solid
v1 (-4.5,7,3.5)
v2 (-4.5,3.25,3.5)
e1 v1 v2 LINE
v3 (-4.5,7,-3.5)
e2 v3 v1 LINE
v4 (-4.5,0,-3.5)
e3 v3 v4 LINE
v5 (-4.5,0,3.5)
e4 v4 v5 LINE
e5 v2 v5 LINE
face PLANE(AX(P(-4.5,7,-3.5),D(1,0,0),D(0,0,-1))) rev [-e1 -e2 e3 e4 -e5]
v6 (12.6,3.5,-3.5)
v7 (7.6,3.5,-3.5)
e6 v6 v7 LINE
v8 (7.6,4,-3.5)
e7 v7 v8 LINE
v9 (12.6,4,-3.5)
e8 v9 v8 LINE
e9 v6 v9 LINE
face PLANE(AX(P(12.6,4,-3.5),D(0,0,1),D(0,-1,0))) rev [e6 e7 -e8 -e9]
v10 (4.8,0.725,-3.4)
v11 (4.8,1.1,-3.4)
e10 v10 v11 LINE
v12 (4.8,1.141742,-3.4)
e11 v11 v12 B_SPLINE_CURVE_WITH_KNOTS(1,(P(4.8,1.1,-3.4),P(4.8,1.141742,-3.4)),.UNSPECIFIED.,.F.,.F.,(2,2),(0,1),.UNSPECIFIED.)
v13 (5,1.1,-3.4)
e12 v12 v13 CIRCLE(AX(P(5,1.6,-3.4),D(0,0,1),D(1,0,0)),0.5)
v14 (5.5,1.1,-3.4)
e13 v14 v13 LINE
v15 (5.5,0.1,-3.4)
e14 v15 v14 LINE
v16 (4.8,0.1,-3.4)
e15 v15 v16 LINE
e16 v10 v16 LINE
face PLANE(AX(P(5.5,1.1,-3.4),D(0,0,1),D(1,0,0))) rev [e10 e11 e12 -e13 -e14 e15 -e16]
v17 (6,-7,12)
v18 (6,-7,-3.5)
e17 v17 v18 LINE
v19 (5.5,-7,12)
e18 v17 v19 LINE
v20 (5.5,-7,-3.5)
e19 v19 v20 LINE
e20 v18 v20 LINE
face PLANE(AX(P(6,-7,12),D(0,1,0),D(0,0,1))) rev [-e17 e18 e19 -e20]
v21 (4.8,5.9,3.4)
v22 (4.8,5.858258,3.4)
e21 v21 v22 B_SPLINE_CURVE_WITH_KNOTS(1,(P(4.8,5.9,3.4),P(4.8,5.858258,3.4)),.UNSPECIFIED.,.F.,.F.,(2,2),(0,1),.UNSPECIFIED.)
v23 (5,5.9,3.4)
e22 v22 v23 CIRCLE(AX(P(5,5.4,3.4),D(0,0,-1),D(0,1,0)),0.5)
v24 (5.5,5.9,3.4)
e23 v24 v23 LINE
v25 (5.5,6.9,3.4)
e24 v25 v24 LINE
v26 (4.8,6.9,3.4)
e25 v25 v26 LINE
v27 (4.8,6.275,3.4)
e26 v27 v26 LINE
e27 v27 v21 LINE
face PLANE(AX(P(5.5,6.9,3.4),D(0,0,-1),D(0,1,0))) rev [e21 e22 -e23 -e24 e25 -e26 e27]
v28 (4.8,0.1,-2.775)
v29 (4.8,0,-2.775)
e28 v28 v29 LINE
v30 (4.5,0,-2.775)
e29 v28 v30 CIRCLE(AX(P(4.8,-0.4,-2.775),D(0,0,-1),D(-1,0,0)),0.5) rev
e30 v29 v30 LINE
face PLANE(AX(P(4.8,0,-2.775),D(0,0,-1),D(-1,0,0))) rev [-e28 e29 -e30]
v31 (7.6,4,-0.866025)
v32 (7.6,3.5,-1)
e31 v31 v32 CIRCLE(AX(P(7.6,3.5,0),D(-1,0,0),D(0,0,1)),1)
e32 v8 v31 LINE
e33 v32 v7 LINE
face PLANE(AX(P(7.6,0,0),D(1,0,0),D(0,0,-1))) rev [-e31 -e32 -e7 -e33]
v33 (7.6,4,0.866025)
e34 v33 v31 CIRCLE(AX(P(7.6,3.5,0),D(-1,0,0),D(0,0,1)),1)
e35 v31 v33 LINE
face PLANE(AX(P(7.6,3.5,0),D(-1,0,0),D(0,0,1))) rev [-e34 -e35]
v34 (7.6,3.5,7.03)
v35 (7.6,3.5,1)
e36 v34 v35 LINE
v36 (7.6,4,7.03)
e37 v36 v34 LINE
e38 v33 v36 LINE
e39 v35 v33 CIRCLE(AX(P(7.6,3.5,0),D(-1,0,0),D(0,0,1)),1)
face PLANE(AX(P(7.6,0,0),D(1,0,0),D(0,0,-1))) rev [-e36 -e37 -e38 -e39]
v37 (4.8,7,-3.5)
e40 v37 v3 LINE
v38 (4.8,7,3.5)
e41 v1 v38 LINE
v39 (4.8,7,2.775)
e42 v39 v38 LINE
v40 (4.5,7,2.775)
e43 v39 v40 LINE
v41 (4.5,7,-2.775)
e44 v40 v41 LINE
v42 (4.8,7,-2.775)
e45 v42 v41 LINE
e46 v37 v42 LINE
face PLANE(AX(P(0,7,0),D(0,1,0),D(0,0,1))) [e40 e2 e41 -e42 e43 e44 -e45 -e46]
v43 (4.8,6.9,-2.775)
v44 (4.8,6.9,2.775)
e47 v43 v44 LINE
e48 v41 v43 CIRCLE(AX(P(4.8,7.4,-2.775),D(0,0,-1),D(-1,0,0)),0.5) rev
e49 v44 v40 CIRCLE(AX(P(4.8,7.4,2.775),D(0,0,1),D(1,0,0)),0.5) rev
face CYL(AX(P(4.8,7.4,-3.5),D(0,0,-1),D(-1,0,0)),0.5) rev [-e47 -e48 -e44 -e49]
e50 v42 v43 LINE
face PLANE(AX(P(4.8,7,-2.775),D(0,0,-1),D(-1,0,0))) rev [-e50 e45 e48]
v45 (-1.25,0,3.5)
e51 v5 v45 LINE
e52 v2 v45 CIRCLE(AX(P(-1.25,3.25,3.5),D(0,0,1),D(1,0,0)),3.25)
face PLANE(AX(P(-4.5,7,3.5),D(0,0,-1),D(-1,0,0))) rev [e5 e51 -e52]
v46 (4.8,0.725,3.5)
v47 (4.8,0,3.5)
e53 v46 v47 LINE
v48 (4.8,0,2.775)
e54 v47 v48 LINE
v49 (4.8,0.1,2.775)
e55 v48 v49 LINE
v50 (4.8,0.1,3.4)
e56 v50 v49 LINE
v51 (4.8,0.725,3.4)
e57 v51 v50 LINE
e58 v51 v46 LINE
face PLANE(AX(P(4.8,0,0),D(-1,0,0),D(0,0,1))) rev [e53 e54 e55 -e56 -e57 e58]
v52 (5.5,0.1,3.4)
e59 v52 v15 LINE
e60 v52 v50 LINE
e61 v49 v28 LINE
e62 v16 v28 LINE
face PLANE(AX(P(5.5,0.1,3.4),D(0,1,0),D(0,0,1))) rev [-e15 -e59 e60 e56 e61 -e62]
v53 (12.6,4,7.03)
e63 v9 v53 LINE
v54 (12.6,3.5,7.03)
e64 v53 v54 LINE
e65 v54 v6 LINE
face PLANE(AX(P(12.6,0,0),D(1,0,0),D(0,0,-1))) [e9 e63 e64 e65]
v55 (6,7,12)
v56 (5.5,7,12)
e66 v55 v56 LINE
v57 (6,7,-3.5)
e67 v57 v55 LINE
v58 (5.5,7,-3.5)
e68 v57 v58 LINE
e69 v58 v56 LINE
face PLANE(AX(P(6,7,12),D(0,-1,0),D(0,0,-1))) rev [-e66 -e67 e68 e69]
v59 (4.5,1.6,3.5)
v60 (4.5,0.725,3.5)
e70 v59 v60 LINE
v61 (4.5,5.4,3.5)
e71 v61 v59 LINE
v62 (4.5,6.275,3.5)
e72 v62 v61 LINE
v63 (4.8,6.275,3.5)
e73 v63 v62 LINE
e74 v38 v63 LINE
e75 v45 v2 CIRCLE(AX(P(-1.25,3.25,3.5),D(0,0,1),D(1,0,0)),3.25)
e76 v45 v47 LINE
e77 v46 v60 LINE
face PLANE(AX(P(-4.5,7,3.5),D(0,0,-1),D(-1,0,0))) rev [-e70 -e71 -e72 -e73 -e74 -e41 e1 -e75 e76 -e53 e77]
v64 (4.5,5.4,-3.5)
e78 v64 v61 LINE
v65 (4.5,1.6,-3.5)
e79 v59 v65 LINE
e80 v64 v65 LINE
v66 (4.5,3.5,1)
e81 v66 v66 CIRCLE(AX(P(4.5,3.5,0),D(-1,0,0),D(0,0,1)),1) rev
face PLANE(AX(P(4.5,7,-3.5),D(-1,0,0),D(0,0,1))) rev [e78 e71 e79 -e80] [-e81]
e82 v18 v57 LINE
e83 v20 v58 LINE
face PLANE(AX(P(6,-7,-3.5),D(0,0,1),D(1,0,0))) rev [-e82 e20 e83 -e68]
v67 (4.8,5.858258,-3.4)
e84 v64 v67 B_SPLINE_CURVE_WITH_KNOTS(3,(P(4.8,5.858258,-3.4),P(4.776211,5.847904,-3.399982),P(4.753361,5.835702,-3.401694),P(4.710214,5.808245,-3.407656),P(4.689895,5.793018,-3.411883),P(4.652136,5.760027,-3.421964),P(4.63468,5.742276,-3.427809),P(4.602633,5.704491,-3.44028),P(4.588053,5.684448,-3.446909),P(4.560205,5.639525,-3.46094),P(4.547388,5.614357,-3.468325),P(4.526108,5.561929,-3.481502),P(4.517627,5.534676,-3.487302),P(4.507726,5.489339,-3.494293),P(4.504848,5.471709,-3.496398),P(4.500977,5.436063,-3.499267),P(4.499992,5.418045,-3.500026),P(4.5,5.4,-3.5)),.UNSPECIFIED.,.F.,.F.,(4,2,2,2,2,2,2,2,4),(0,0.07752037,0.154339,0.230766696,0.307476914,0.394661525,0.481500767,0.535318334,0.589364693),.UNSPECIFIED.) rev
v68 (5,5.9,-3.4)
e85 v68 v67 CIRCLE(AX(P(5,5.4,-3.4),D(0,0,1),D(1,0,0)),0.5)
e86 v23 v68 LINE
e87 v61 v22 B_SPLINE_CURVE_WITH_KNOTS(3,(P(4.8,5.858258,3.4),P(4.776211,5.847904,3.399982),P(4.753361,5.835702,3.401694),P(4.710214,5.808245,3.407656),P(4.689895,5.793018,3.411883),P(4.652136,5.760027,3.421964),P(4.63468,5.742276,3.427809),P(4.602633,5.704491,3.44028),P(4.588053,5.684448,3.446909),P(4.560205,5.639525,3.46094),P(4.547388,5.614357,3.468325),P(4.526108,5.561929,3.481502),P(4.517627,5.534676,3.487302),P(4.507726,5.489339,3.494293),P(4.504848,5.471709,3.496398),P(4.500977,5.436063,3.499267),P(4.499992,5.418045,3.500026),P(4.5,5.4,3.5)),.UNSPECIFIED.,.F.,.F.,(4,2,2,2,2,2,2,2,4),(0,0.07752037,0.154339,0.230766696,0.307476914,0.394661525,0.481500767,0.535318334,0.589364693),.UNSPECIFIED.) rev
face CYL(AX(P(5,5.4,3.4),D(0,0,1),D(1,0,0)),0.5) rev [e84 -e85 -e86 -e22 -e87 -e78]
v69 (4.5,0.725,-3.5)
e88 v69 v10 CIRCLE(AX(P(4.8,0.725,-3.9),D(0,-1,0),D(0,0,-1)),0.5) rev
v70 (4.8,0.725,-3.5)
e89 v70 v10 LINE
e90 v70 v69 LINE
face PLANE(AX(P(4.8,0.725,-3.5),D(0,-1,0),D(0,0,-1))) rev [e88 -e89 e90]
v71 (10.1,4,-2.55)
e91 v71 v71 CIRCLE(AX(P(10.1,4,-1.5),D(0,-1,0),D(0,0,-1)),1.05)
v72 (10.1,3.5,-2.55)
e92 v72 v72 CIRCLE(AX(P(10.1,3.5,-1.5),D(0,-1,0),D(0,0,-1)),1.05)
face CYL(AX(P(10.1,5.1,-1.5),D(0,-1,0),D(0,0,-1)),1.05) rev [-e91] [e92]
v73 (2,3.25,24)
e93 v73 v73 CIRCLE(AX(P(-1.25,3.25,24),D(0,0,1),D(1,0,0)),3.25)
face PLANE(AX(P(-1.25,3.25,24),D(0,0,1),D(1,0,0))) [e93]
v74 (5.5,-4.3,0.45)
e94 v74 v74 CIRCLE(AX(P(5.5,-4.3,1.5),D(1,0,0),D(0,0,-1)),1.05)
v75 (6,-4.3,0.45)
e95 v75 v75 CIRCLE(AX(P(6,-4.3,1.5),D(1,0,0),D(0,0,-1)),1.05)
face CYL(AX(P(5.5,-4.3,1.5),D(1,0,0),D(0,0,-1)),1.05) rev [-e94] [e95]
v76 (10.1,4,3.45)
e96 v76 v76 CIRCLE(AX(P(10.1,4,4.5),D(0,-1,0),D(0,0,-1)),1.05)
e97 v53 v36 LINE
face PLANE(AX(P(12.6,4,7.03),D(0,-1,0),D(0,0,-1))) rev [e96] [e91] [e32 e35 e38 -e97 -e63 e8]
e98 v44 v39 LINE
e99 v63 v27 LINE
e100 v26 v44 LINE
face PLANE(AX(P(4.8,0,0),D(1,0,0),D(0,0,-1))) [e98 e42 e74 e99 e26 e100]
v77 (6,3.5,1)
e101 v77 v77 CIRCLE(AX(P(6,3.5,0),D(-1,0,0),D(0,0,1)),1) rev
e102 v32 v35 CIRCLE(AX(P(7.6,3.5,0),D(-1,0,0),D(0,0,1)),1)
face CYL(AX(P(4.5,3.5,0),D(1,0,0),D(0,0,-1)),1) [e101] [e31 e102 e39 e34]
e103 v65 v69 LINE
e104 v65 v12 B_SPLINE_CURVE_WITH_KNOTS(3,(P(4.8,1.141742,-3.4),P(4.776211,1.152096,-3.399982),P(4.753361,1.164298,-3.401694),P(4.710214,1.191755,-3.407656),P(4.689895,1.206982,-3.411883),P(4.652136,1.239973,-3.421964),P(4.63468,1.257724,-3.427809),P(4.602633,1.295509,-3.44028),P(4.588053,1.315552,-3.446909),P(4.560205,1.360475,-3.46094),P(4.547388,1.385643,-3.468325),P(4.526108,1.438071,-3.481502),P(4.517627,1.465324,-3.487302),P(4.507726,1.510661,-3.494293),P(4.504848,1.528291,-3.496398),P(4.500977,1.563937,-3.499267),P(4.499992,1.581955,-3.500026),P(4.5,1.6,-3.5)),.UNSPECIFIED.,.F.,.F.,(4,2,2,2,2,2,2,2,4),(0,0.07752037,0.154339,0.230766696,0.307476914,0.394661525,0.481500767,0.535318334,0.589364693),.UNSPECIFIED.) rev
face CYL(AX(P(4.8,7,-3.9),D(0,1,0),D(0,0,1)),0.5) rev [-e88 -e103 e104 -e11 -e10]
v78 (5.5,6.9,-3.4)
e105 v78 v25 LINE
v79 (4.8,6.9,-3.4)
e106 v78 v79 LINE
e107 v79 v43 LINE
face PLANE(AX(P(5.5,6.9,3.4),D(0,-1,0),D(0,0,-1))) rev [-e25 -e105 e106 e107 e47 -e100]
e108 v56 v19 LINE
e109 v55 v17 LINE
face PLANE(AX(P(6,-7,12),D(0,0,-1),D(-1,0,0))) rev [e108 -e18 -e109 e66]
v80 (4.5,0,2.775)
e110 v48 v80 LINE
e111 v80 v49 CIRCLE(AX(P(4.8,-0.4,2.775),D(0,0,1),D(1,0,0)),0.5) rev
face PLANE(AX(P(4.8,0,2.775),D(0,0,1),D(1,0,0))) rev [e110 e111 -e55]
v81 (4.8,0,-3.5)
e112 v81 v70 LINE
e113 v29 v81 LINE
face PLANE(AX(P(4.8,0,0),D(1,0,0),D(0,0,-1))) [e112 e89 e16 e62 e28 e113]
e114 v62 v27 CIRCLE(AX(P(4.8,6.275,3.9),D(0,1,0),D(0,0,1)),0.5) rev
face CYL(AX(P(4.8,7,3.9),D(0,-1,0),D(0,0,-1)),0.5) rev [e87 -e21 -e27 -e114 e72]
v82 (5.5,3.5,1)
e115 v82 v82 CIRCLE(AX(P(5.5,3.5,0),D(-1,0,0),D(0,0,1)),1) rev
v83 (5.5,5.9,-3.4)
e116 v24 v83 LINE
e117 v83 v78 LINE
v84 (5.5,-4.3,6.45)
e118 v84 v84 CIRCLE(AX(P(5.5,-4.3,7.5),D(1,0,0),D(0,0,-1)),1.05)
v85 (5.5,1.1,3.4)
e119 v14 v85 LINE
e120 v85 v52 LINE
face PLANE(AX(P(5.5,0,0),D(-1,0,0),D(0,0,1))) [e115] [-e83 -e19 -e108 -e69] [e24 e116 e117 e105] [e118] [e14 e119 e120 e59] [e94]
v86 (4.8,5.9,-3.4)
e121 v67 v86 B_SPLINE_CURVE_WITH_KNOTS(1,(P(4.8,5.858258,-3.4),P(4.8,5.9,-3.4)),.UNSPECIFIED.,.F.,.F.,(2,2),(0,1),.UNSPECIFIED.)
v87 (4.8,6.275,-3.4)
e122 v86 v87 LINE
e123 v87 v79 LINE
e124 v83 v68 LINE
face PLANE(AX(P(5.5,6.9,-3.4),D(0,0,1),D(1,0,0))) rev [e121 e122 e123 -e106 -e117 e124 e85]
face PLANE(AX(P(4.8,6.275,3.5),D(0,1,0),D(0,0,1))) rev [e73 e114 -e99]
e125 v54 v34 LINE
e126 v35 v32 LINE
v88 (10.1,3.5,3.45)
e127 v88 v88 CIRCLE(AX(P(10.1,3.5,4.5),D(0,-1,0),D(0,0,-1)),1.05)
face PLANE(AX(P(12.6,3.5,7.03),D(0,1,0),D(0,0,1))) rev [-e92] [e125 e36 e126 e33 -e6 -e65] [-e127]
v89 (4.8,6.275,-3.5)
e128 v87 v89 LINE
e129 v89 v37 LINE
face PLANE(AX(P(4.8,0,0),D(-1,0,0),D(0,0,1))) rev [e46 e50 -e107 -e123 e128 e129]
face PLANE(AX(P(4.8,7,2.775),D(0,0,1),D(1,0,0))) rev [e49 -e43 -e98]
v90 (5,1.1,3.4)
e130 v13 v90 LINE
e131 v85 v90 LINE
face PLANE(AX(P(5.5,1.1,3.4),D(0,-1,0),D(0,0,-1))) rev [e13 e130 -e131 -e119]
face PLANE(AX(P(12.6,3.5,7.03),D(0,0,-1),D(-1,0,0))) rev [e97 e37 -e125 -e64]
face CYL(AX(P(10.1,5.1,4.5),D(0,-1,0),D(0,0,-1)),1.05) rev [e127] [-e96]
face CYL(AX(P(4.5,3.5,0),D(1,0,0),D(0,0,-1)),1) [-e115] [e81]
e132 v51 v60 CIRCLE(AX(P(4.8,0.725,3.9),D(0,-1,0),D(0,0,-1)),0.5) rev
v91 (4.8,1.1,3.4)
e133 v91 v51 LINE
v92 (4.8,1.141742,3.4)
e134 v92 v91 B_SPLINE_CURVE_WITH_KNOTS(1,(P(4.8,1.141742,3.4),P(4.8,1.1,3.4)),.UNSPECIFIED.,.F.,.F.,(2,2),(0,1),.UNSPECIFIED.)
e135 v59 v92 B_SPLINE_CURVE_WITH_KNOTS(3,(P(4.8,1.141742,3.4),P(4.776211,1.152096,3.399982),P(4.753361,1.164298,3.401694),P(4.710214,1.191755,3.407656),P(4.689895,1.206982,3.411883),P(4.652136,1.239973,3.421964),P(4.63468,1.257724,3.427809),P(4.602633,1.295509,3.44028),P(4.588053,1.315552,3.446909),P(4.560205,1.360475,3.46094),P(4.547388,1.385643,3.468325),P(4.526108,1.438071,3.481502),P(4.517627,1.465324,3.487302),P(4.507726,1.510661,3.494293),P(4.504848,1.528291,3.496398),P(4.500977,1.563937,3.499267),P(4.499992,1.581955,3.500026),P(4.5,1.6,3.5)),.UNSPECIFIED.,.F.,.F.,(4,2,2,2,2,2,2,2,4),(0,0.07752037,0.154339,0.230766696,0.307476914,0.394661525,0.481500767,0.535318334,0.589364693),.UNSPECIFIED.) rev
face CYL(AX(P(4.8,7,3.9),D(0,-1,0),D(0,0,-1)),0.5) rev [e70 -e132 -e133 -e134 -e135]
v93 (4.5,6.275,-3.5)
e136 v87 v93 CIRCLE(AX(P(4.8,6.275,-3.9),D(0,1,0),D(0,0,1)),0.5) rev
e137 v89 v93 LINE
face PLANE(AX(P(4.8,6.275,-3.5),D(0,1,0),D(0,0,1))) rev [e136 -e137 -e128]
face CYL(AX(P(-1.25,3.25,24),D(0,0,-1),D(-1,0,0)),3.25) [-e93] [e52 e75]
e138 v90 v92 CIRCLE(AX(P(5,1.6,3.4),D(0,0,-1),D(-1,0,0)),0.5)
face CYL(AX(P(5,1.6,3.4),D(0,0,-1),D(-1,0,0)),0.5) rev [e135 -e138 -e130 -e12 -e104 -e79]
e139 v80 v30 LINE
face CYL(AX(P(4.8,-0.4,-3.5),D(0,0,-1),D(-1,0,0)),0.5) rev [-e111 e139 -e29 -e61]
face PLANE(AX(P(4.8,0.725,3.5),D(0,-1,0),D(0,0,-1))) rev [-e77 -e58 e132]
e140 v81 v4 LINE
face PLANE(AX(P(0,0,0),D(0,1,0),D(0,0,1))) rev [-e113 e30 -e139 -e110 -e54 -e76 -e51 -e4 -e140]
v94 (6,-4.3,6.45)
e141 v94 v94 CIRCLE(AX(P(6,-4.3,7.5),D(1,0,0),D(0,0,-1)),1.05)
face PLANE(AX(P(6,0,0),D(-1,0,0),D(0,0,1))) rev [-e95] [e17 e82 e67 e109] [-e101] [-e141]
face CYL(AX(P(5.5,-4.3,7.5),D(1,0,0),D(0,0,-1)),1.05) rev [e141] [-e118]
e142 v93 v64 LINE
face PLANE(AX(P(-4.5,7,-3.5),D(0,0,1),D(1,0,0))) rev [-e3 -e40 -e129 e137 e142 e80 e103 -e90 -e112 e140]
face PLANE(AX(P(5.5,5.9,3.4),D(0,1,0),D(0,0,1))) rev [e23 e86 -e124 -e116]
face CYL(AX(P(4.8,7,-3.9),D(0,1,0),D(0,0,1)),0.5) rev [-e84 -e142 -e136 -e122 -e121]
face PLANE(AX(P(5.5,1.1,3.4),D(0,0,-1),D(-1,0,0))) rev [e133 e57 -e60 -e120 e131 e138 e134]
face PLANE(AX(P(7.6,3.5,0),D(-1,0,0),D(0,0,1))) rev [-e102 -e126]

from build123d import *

# Parameters (mm, degrees)
SKETCH1_W            = 9
SKETCH1_H            = 7
BOSS_EXTRUDE1_DEPTH  = 7
SKETCH4_W            = 0.725
SKETCH4_H            = 0.725
BOSS_EXTRUDE3_DEPTH  = 0.3
SKETCH7_W            = 6.8
SKETCH7_H            = 1
BOSS_EXTRUDE5_DEPTH  = 1
FILLET1_R            = 0.5
SKETCH8_W            = 15.5
SKETCH8_H            = 14
BOSS_EXTRUDE6_DEPTH  = 0.5
EXTRUDE_9_DEPTH      = 10
EXTRUDE_9_DEPTH_BACK = 2.1
SKETCH_6_R           = 1
SKETCH10_W           = 10.53
SKETCH10_H           = 0.5
BOSS_EXTRUDE9_DEPTH  = 5
SKETCH_3_R           = 1.05
CUT_EXTRUDE_2_DEPTH  = 0.5
SKETCH_5_R           = 3.25
EXTRUDE_2_DEPTH      = 20.5
SKETCH_7_R           = 1.05
CUT_EXTRUDE_3_DEPTH  = 1.6


with BuildPart() as part:
    # Sketch1 → Boss-Extrude1 (new body)
    with BuildSketch(Plane(origin=(0, 0, 0), x_dir=(1, 0, 0), z_dir=(0, 1, 0))):
        Rectangle(SKETCH1_W, SKETCH1_H)
    extrude(amount=BOSS_EXTRUDE1_DEPTH)

    # Sketch4 → Boss-Extrude3 (add)
    with BuildSketch(Plane(origin=(4.5, 0, 0), x_dir=(0, 0, -1), z_dir=(1, 0, 0))):
        with Locations((-3.1375, 6.6375)):
            Rectangle(SKETCH4_W, SKETCH4_H)
        with Locations((3.1375, 6.6375)):
            Rectangle(SKETCH4_W, SKETCH4_H)
        with Locations((-3.1375, 0.3625)):
            Rectangle(SKETCH4_W, SKETCH4_H)
        with Locations((3.1375, 0.3625)):
            Rectangle(SKETCH4_W, SKETCH4_H)
    extrude(amount=BOSS_EXTRUDE3_DEPTH)

    # Sketch7 → Boss-Extrude5 (add)
    with BuildSketch(Plane(origin=(4.5, 0, 0), x_dir=(0, 0, -1), z_dir=(1, 0, 0))):
        with Locations((0, 0.6)):
            Rectangle(SKETCH7_W, SKETCH7_H)
        with Locations((0, 6.4)):
            Rectangle(SKETCH7_W, SKETCH7_H)
    extrude(amount=BOSS_EXTRUDE5_DEPTH)

    # Fillet1
    # the kernel refuses this fillet: 0.5 mm, written as the material it adds along each edge
    with BuildSketch(Plane(origin=(4.5, 6.9, 3.525), x_dir=(0, 1, 0), z_dir=(0, 0, -1))) as fillet1_piece_1_section:
        with BuildLine():
            CenterArc((0.5, 0.3), FILLET1_R, 180, 36.869897646)
            Line((0, 0.3), (0, 0))
            Line((0, 0), (0.1, 0))
        make_face()
    fillet1_piece_1 = extrude(amount=7.05, mode=Mode.PRIVATE)
    fillet1_piece_1 = split(fillet1_piece_1, bisect_by=Plane(origin=(4.5, 6.9, -3.4), z_dir=(0, 0, 1)), keep=Keep.TOP, mode=Mode.PRIVATE)
    fillet1_piece_1 = split(fillet1_piece_1, bisect_by=Plane(origin=(4.5, 6.9, 3.4), z_dir=(0, 0, -1)), keep=Keep.TOP, mode=Mode.PRIVATE)
    add(fillet1_piece_1)
    with BuildSketch(Plane(origin=(4.5, 5.9, 3.4), x_dir=(0, 0, 1), z_dir=(0, 1, 0))) as fillet1_piece_2:
        with BuildLine():
            CenterArc((0.5, 0.3), FILLET1_R, 180, 36.869897646)
            Line((0, 0.3), (0, 0))
            Line((0, 0), (0.1, 0))
        make_face()
    extrude(amount=0.375)
    with BuildSketch(Plane(origin=(4.5, 5.9, -3.4), x_dir=(0, -1, 0), z_dir=(0, 0, 1)), Plane(origin=(4.5, 1.1, 3.4), x_dir=(0, 1, 0), z_dir=(0, 0, -1))) as fillet1_piece_3:
        with BuildLine():
            CenterArc((FILLET1_R, FILLET1_R), FILLET1_R, 180, 90)
            Line((0, FILLET1_R), (0, 0))
            Line((0, 0), (FILLET1_R, 0))
        make_face()
    extrude(amount=6.8)
    with BuildSketch(Plane(origin=(4.5, 7.025, -3.4), x_dir=(0, 0, -1), z_dir=(0, -1, 0))) as fillet1_piece_4_section:
        with BuildLine():
            CenterArc((0.5, 0.3), FILLET1_R, 180, 36.869897646)
            Line((0, 0.3), (0, 0))
            Line((0, 0), (0.1, 0))
        make_face()
    fillet1_piece_4 = extrude(amount=1.125, mode=Mode.PRIVATE)
    fillet1_piece_4 = split(fillet1_piece_4, bisect_by=Plane(origin=(4.5, 6.9, -3.4), z_dir=(0, -1, 0)), keep=Keep.TOP, mode=Mode.PRIVATE)
    add(fillet1_piece_4)
    with BuildSketch(Plane(origin=(4.5, 1.1, -3.4), x_dir=(0, 0, -1), z_dir=(0, -1, 0))) as fillet1_piece_5_section:
        with BuildLine():
            CenterArc((0.5, 0.3), FILLET1_R, 180, 36.869897646)
            Line((0, 0.3), (0, 0))
            Line((0, 0), (0.1, 0))
        make_face()
    fillet1_piece_5 = extrude(amount=1.125, mode=Mode.PRIVATE)
    fillet1_piece_5 = split(fillet1_piece_5, bisect_by=Plane(origin=(4.5, 0.1, -3.4), z_dir=(0, 1, 0)), keep=Keep.TOP, mode=Mode.PRIVATE)
    add(fillet1_piece_5)
    with BuildSketch(Plane(origin=(4.5, -0.025, 3.4), x_dir=(0, 0, 1), z_dir=(0, 1, 0))) as fillet1_piece_6_section:
        with BuildLine():
            CenterArc((0.5, 0.3), FILLET1_R, 180, 36.869897646)
            Line((0, 0.3), (0, 0))
            Line((0, 0), (0.1, 0))
        make_face()
    fillet1_piece_6 = extrude(amount=1.125, mode=Mode.PRIVATE)
    fillet1_piece_6 = split(fillet1_piece_6, bisect_by=Plane(origin=(4.5, 0.1, 3.4), z_dir=(0, 1, 0)), keep=Keep.TOP, mode=Mode.PRIVATE)
    add(fillet1_piece_6)
    with BuildSketch(Plane(origin=(4.5, 0.1, -2.775), x_dir=(1, 0, 0), z_dir=(0, 0, 1))) as fillet1_piece_7:
        with BuildLine():
            CenterArc((0.3, -0.5), FILLET1_R, 90, 36.869897646)
            Line((0, -0.1), (0, 0))
            Line((0, 0), (0.3, 0))
        make_face()
    extrude(amount=5.55)
    with BuildSketch(Plane(origin=(4.5, 5.15, 3.4), x_dir=(0, 0, 1), z_dir=(0, 1, 0))) as fillet1_piece_8a_section:
        with BuildLine():
            CenterArc((0.5, 0.3), FILLET1_R, 180, 36.869897646)
            Line((0, 0.3), (0, 0))
            Line((0, 0), (0.1, 0))
        make_face()
    fillet1_piece_8a = extrude(amount=1.125, mode=Mode.PRIVATE)
    fillet1_piece_8a = split(fillet1_piece_8a, bisect_by=Plane(origin=(4.5, 5.9, 3.4), z_dir=(0, -1, 0)), keep=Keep.TOP, mode=Mode.PRIVATE)
    with BuildSketch(Plane(origin=(4.5, 5.9, -3.4), x_dir=(0, -1, 0), z_dir=(0, 0, 1))) as fillet1_piece_8b_section:
        with BuildLine():
            CenterArc((FILLET1_R, FILLET1_R), FILLET1_R, 180, 90)
            Line((0, FILLET1_R), (0, 0))
            Line((0, 0), (FILLET1_R, 0))
        make_face()
    fillet1_piece_8b = extrude(amount=8.05, mode=Mode.PRIVATE)
    fillet1_piece_8b = split(fillet1_piece_8b, bisect_by=Plane(origin=(4.5, 5.9, 3.5), z_dir=(0, 0, -1)), keep=Keep.TOP, mode=Mode.PRIVATE)
    fillet1_piece_8b = split(fillet1_piece_8b, bisect_by=Plane(origin=(4.5, 5.9, 3.4), z_dir=(0, 0, 1)), keep=Keep.TOP, mode=Mode.PRIVATE)
    fillet1_piece_8 = fillet1_piece_8a & fillet1_piece_8b
    add(fillet1_piece_8)
    with BuildSketch(Plane(origin=(4.5, 5.9, -4.65), x_dir=(0, -1, 0), z_dir=(0, 0, 1))) as fillet1_piece_9a_section:
        with BuildLine():
            CenterArc((FILLET1_R, FILLET1_R), FILLET1_R, 180, 90)
            Line((0, FILLET1_R), (0, 0))
            Line((0, 0), (FILLET1_R, 0))
        make_face()
    fillet1_piece_9a = extrude(amount=8.05, mode=Mode.PRIVATE)
    fillet1_piece_9a = split(fillet1_piece_9a, bisect_by=Plane(origin=(4.5, 5.9, -3.5), z_dir=(0, 0, 1)), keep=Keep.TOP, mode=Mode.PRIVATE)
    fillet1_piece_9a = split(fillet1_piece_9a, bisect_by=Plane(origin=(4.5, 5.9, -3.4), z_dir=(0, 0, -1)), keep=Keep.TOP, mode=Mode.PRIVATE)
    with BuildSketch(Plane(origin=(4.5, 6.275, -3.4), x_dir=(0, 0, -1), z_dir=(0, -1, 0))) as fillet1_piece_9b_section:
        with BuildLine():
            CenterArc((0.5, 0.3), FILLET1_R, 180, 36.869897646)
            Line((0, 0.3), (0, 0))
            Line((0, 0), (0.1, 0))
        make_face()
    fillet1_piece_9b = extrude(amount=1.125, mode=Mode.PRIVATE)
    fillet1_piece_9b = split(fillet1_piece_9b, bisect_by=Plane(origin=(4.5, 5.9, -3.4), z_dir=(0, -1, 0)), keep=Keep.TOP, mode=Mode.PRIVATE)
    fillet1_piece_9 = fillet1_piece_9a & fillet1_piece_9b
    add(fillet1_piece_9)
    with BuildSketch(Plane(origin=(4.5, 1.85, -3.4), x_dir=(0, 0, -1), z_dir=(0, -1, 0))) as fillet1_piece_10a_section:
        with BuildLine():
            CenterArc((0.5, 0.3), FILLET1_R, 180, 36.869897646)
            Line((0, 0.3), (0, 0))
            Line((0, 0), (0.1, 0))
        make_face()
    fillet1_piece_10a = extrude(amount=1.125, mode=Mode.PRIVATE)
    fillet1_piece_10a = split(fillet1_piece_10a, bisect_by=Plane(origin=(4.5, 1.1, -3.4), z_dir=(0, 1, 0)), keep=Keep.TOP, mode=Mode.PRIVATE)
    with BuildSketch(Plane(origin=(4.5, 1.1, 3.4), x_dir=(0, 1, 0), z_dir=(0, 0, -1))) as fillet1_piece_10b_section:
        with BuildLine():
            CenterArc((FILLET1_R, FILLET1_R), FILLET1_R, 180, 90)
            Line((0, FILLET1_R), (0, 0))
            Line((0, 0), (FILLET1_R, 0))
        make_face()
    fillet1_piece_10b = extrude(amount=8.05, mode=Mode.PRIVATE)
    fillet1_piece_10b = split(fillet1_piece_10b, bisect_by=Plane(origin=(4.5, 1.1, -3.5), z_dir=(0, 0, 1)), keep=Keep.TOP, mode=Mode.PRIVATE)
    fillet1_piece_10b = split(fillet1_piece_10b, bisect_by=Plane(origin=(4.5, 1.1, -3.4), z_dir=(0, 0, -1)), keep=Keep.TOP, mode=Mode.PRIVATE)
    fillet1_piece_10 = fillet1_piece_10a & fillet1_piece_10b
    add(fillet1_piece_10)
    with BuildSketch(Plane(origin=(4.5, 1.1, 4.65), x_dir=(0, 1, 0), z_dir=(0, 0, -1))) as fillet1_piece_11a_section:
        with BuildLine():
            CenterArc((FILLET1_R, FILLET1_R), FILLET1_R, 180, 90)
            Line((0, FILLET1_R), (0, 0))
            Line((0, 0), (FILLET1_R, 0))
        make_face()
    fillet1_piece_11a = extrude(amount=8.05, mode=Mode.PRIVATE)
    fillet1_piece_11a = split(fillet1_piece_11a, bisect_by=Plane(origin=(4.5, 1.1, 3.5), z_dir=(0, 0, -1)), keep=Keep.TOP, mode=Mode.PRIVATE)
    fillet1_piece_11a = split(fillet1_piece_11a, bisect_by=Plane(origin=(4.5, 1.1, 3.4), z_dir=(0, 0, 1)), keep=Keep.TOP, mode=Mode.PRIVATE)
    with BuildSketch(Plane(origin=(4.5, 0.725, 3.4), x_dir=(0, 0, 1), z_dir=(0, 1, 0))) as fillet1_piece_11b_section:
        with BuildLine():
            CenterArc((0.5, 0.3), FILLET1_R, 180, 36.869897646)
            Line((0, 0.3), (0, 0))
            Line((0, 0), (0.1, 0))
        make_face()
    fillet1_piece_11b = extrude(amount=1.125, mode=Mode.PRIVATE)
    fillet1_piece_11b = split(fillet1_piece_11b, bisect_by=Plane(origin=(4.5, 1.1, 3.4), z_dir=(0, 1, 0)), keep=Keep.TOP, mode=Mode.PRIVATE)
    fillet1_piece_11 = fillet1_piece_11a & fillet1_piece_11b
    add(fillet1_piece_11)

    # Sketch8 → Boss-Extrude6 (add)
    with BuildSketch(Plane(origin=(5.5, 0, 0), x_dir=(0, 0, -1), z_dir=(1, 0, 0))):
        with Locations((-4.25, 0)):
            Rectangle(SKETCH8_W, SKETCH8_H)
    extrude(amount=BOSS_EXTRUDE6_DEPTH)

    # ｽｹｯﾁ6 → ﾎﾞｽ - 押し出し9 (add, two sides: drawn at the far end of the back side and taken through both)
    with BuildSketch(Plane.ZY.offset(-5.5).offset(-EXTRUDE_9_DEPTH_BACK)):
        with Locations((0, 3.5)):
            Circle(SKETCH_6_R)
    extrude(amount=EXTRUDE_9_DEPTH + EXTRUDE_9_DEPTH_BACK)

    # Sketch10 → Boss-Extrude9 (add)
    with BuildSketch(Plane(origin=(7.6, 0, 0), x_dir=(0, 0, -1), z_dir=(1, 0, 0))):
        with Locations((-1.765, 3.75)):
            Rectangle(SKETCH10_W, SKETCH10_H)
    extrude(amount=BOSS_EXTRUDE9_DEPTH)

    # ｽｹｯﾁ3 → ｶｯﾄ - 押し出し2 (cut)
    with BuildSketch(Plane(origin=(6, 0, 0), x_dir=(0, 0, -1), z_dir=(1, 0, 0))):
        with Locations((-1.5, -4.3)):
            Circle(SKETCH_3_R)
        with Locations((-7.5, -4.3)):
            Circle(SKETCH_3_R)
    extrude(amount=-CUT_EXTRUDE_2_DEPTH, mode=Mode.SUBTRACT)

    # ｽｹｯﾁ5 → ﾎﾞｽ - 押し出し2 (add)
    with BuildSketch(Plane.XY.offset(3.5)):
        with Locations(Location((-1.25, 3.25, 0), (0, 0, 180))):
            Circle(SKETCH_5_R)
    extrude(amount=EXTRUDE_2_DEPTH)

    # ｽｹｯﾁ7 → ｶｯﾄ - 押し出し3 (cut)
    with BuildSketch(Plane(origin=(0, 3.5, 0), x_dir=(-1, 0, 0), z_dir=(0, -1, 0))):
        with Locations(Location((-10.1, -4.5, 0), (0, 0, 90))):
            Circle(SKETCH_7_R)
        with Locations(Location((-10.1, 1.5, 0), (0, 0, 90))):
            Circle(SKETCH_7_R)
    extrude(amount=-CUT_EXTRUDE_3_DEPTH, mode=Mode.SUBTRACT)


solid = part.part
